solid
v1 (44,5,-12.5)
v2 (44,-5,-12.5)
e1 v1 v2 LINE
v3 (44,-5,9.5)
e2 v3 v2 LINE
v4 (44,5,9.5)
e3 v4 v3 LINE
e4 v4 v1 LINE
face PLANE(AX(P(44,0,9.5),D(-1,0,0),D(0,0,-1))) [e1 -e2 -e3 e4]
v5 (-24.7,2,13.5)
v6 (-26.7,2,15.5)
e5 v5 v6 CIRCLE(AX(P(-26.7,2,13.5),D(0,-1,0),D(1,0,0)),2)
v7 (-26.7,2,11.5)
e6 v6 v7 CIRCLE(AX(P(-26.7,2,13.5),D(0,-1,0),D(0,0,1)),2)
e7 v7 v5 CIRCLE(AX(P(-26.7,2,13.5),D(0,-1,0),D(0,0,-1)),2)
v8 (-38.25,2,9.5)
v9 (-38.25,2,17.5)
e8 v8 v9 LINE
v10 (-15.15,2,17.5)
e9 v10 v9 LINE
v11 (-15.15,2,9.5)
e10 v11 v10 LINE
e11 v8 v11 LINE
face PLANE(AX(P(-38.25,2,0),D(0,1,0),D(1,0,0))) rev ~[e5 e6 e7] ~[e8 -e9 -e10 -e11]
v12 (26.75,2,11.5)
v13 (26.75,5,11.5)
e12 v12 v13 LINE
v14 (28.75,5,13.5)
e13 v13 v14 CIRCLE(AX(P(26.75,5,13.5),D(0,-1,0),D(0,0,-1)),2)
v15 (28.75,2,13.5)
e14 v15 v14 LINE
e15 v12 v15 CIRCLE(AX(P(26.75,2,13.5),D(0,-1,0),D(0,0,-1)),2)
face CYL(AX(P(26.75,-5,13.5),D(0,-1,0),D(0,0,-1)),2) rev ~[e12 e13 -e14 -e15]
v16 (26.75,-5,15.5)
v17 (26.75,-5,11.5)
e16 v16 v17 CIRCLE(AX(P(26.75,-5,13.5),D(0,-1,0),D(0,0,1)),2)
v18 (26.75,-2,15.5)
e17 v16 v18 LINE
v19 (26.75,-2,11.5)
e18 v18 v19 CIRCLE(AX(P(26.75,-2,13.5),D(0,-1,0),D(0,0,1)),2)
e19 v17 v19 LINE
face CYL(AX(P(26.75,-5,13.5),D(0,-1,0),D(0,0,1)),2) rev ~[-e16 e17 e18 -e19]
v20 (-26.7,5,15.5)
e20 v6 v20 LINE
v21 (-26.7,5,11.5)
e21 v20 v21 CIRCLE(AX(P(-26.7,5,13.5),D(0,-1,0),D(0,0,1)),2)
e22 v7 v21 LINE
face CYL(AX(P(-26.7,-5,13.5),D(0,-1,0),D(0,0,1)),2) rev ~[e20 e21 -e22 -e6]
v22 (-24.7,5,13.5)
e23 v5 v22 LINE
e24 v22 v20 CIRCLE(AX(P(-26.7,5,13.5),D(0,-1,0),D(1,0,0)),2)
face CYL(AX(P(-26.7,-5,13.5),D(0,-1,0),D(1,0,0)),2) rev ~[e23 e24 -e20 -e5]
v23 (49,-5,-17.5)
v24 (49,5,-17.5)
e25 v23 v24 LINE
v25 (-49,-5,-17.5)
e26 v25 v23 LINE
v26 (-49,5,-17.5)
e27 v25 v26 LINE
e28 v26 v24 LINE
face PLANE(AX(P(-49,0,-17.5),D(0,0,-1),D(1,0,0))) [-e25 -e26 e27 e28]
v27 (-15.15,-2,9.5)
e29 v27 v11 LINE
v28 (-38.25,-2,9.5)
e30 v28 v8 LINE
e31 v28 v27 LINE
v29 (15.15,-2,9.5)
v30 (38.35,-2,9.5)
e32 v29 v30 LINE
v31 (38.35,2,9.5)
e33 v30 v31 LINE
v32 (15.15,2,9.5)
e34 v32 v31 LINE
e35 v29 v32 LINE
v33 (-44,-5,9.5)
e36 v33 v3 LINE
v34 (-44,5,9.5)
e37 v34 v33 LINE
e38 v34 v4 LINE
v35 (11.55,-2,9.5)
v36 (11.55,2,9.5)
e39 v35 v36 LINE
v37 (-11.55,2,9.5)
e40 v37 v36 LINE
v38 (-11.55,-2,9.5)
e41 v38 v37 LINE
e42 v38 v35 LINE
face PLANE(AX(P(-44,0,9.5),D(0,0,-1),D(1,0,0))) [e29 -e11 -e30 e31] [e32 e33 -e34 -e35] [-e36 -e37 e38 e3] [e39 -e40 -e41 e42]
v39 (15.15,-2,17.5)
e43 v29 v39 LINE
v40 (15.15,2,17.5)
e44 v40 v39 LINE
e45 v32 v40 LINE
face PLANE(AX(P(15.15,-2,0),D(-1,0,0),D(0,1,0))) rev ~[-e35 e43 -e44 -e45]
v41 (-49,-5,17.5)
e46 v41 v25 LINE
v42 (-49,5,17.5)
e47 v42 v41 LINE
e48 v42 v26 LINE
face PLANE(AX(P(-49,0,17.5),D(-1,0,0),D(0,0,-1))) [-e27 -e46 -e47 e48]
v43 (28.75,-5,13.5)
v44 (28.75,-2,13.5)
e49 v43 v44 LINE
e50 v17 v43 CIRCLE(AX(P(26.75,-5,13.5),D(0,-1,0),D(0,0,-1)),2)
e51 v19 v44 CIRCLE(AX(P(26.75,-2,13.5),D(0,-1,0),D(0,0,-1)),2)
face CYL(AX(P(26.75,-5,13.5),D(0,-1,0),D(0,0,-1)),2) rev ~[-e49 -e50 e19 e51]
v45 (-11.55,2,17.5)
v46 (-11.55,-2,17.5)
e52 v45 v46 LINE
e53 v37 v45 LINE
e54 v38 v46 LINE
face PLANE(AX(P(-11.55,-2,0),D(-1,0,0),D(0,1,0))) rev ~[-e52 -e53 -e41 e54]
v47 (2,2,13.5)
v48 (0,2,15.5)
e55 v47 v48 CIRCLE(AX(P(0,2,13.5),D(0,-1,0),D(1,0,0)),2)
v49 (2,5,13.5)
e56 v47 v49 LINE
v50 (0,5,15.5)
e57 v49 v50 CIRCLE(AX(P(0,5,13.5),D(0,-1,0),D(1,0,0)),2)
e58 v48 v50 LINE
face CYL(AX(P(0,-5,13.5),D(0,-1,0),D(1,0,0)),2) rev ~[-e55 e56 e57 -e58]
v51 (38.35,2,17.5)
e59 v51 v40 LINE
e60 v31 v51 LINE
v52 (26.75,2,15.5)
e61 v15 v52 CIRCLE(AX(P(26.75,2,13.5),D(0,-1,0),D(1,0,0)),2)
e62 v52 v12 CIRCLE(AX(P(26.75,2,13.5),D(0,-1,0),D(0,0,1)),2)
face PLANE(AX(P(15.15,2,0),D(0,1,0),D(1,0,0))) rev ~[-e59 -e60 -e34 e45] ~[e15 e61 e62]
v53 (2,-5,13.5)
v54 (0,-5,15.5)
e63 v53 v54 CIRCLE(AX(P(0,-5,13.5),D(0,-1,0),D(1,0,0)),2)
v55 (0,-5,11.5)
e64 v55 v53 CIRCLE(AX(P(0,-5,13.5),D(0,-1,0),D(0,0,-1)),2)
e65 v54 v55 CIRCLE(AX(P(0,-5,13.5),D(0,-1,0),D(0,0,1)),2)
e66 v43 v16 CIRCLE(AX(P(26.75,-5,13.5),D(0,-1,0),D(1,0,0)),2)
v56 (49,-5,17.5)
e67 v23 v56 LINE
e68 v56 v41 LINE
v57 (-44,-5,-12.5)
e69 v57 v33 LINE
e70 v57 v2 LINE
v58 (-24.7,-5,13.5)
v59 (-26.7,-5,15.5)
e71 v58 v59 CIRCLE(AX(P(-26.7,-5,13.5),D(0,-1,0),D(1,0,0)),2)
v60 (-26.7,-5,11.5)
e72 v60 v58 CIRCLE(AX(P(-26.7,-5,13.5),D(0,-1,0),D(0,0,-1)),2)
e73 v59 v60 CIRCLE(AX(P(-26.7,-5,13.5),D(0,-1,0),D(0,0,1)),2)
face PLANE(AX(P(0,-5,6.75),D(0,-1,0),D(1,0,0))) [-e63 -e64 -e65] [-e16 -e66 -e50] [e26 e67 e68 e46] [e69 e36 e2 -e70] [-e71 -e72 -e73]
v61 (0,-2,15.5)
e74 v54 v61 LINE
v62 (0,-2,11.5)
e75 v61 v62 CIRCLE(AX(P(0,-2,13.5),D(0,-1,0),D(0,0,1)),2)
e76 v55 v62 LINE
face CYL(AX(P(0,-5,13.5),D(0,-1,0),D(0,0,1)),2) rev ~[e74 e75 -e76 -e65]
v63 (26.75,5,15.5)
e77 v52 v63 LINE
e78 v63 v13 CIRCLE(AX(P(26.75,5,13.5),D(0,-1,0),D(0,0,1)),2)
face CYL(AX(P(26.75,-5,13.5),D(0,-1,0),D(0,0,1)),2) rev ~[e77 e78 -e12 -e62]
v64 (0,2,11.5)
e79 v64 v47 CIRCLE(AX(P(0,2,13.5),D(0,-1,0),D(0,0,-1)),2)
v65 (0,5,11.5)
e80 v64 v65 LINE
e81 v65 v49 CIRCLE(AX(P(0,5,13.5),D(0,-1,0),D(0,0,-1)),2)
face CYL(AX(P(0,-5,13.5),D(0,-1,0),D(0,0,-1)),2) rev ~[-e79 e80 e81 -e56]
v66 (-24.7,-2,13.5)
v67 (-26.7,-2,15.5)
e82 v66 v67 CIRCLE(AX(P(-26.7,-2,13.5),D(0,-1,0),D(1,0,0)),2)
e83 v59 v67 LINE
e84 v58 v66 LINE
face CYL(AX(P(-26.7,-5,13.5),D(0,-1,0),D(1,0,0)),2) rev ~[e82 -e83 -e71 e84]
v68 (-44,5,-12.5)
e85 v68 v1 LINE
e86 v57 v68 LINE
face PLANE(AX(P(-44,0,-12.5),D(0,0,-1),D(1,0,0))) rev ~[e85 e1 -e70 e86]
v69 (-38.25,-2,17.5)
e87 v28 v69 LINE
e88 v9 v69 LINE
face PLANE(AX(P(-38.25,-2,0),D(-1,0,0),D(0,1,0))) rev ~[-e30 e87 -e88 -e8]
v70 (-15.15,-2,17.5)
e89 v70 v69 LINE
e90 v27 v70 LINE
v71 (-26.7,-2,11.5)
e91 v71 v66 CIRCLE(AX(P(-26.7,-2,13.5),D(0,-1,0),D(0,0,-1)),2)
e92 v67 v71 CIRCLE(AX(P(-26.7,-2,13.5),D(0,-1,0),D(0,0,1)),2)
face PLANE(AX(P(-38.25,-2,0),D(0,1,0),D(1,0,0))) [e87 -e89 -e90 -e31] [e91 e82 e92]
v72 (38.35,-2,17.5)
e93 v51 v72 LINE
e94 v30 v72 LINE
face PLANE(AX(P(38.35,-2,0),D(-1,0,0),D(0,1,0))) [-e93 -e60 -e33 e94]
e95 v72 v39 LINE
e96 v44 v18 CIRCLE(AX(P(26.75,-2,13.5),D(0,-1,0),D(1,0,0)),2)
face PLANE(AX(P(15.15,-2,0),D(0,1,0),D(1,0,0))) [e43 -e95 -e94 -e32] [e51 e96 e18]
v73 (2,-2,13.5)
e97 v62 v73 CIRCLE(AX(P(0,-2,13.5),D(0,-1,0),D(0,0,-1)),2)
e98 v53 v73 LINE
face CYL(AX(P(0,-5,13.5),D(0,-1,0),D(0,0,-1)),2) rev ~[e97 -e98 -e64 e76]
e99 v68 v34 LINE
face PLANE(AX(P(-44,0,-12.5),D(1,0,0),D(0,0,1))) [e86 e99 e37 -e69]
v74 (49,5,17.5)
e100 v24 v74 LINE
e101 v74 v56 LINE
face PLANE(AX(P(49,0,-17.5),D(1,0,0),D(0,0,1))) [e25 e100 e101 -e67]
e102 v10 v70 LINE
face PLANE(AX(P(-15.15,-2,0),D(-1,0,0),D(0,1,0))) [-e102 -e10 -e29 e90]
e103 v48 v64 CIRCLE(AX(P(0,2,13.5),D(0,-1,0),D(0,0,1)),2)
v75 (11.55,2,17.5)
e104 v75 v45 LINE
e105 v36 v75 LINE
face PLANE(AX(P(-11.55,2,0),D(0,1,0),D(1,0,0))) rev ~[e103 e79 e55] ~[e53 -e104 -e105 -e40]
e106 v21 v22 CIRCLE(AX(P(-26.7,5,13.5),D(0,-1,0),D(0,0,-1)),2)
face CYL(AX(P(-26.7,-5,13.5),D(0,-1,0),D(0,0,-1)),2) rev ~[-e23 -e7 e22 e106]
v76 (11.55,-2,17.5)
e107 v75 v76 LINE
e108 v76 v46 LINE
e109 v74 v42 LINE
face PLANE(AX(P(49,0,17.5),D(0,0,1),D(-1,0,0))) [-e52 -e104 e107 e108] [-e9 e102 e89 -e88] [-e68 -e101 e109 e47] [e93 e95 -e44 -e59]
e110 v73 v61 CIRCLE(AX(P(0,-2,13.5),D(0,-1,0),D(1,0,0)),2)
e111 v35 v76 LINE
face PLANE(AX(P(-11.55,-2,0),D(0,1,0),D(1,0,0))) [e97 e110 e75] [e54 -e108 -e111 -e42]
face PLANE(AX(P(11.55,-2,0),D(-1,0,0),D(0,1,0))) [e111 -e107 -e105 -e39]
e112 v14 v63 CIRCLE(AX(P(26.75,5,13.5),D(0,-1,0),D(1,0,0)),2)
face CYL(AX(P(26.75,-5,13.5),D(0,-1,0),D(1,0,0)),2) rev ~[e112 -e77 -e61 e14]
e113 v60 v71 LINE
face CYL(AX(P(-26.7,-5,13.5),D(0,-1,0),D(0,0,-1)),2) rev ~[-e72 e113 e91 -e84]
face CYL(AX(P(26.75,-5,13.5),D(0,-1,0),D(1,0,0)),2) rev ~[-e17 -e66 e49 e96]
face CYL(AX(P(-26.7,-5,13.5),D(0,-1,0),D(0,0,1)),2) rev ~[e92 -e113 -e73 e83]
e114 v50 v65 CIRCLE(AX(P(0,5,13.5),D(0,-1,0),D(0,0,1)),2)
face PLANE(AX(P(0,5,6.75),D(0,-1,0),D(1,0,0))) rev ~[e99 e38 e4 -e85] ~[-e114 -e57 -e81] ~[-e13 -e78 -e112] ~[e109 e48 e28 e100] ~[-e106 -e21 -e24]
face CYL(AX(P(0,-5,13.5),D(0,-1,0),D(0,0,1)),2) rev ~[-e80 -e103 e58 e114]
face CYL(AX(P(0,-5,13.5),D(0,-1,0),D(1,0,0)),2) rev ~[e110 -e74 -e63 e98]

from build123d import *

# Parameters (mm, degrees)
F0_W     = 88
F0_H     = 5
F1_DEPTH = 5
F2_W     = 23.1
F2_H     = 4
F2_W_2   = 23.2
F3_DEPTH = 17.501
F5_DEPTH = 10.001


# Not quite as in the source:
# - a feature names something its author has since deleted; it is built from what else it names


with BuildPart() as f1:
    # F0 (on Front) → F1 (new body, symmetric)
    with BuildSketch(Plane.XZ):
        Polygon((44, -17.5), (49, -17.5), (49, 17.5), (-49, 17.5), (-49, -17.5), (-44, -17.5), (-44, -12.5), (-44, 9.5), (44, 9.5), (44, -12.5), align=None)
        with Locations((0, -15)):
            Rectangle(F0_W, F0_H)
    extrude(amount=F1_DEPTH, both=True)

    # F2 (on Top) → F3 (cut, through all)
    with BuildSketch(Plane.XY):
        with Locations((-26.7, 0)):
            Rectangle(F2_W, F2_H)
        Rectangle(F2_W, F2_H)
        with Locations((26.75, 0)):
            Rectangle(F2_W_2, F2_H)
    extrude(amount=F3_DEPTH, mode=Mode.SUBTRACT)

    # F4 (on face) → F5 (cut, through all)
    with BuildSketch(Plane.XZ.offset(5)):
        with BuildLine():
            ThreePointArc((-26.7, 15.5), (-28.7, 13.5), (-26.7, 11.5))
            Line((-26.7, 11.5), (-26.7, 15.5))
        make_face()
        with BuildLine():
            Line((-26.7, 15.5), (-26.7, 11.5))
            ThreePointArc((-26.7, 11.5), (-25.2857864376, 12.0857864376), (-24.7, 13.5))
            ThreePointArc((-24.7, 13.5), (-25.2857864376, 14.9142135624), (-26.7, 15.5))
        make_face()
        with BuildLine():
            ThreePointArc((0, 15.5), (-2, 13.5), (0, 11.5))
            Line((0, 11.5), (0, 15.5))
        make_face()
        with BuildLine():
            Line((0, 15.5), (0, 11.5))
            ThreePointArc((0, 11.5), (1.4142135624, 12.0857864376), (2, 13.5))
            ThreePointArc((2, 13.5), (1.4142135624, 14.9142135624), (0, 15.5))
        make_face()
        with BuildLine():
            ThreePointArc((26.75, 15.5), (24.75, 13.5), (26.75, 11.5))
            Line((26.75, 11.5), (26.75, 15.5))
        make_face()
        with BuildLine():
            Line((26.75, 15.5), (26.75, 11.5))
            ThreePointArc((26.75, 11.5), (28.1642135624, 12.0857864376), (28.75, 13.5))
            ThreePointArc((28.75, 13.5), (28.1642135624, 14.9142135624), (26.75, 15.5))
        make_face()
    extrude(amount=-F5_DEPTH, mode=Mode.SUBTRACT)


solid = f1.part
